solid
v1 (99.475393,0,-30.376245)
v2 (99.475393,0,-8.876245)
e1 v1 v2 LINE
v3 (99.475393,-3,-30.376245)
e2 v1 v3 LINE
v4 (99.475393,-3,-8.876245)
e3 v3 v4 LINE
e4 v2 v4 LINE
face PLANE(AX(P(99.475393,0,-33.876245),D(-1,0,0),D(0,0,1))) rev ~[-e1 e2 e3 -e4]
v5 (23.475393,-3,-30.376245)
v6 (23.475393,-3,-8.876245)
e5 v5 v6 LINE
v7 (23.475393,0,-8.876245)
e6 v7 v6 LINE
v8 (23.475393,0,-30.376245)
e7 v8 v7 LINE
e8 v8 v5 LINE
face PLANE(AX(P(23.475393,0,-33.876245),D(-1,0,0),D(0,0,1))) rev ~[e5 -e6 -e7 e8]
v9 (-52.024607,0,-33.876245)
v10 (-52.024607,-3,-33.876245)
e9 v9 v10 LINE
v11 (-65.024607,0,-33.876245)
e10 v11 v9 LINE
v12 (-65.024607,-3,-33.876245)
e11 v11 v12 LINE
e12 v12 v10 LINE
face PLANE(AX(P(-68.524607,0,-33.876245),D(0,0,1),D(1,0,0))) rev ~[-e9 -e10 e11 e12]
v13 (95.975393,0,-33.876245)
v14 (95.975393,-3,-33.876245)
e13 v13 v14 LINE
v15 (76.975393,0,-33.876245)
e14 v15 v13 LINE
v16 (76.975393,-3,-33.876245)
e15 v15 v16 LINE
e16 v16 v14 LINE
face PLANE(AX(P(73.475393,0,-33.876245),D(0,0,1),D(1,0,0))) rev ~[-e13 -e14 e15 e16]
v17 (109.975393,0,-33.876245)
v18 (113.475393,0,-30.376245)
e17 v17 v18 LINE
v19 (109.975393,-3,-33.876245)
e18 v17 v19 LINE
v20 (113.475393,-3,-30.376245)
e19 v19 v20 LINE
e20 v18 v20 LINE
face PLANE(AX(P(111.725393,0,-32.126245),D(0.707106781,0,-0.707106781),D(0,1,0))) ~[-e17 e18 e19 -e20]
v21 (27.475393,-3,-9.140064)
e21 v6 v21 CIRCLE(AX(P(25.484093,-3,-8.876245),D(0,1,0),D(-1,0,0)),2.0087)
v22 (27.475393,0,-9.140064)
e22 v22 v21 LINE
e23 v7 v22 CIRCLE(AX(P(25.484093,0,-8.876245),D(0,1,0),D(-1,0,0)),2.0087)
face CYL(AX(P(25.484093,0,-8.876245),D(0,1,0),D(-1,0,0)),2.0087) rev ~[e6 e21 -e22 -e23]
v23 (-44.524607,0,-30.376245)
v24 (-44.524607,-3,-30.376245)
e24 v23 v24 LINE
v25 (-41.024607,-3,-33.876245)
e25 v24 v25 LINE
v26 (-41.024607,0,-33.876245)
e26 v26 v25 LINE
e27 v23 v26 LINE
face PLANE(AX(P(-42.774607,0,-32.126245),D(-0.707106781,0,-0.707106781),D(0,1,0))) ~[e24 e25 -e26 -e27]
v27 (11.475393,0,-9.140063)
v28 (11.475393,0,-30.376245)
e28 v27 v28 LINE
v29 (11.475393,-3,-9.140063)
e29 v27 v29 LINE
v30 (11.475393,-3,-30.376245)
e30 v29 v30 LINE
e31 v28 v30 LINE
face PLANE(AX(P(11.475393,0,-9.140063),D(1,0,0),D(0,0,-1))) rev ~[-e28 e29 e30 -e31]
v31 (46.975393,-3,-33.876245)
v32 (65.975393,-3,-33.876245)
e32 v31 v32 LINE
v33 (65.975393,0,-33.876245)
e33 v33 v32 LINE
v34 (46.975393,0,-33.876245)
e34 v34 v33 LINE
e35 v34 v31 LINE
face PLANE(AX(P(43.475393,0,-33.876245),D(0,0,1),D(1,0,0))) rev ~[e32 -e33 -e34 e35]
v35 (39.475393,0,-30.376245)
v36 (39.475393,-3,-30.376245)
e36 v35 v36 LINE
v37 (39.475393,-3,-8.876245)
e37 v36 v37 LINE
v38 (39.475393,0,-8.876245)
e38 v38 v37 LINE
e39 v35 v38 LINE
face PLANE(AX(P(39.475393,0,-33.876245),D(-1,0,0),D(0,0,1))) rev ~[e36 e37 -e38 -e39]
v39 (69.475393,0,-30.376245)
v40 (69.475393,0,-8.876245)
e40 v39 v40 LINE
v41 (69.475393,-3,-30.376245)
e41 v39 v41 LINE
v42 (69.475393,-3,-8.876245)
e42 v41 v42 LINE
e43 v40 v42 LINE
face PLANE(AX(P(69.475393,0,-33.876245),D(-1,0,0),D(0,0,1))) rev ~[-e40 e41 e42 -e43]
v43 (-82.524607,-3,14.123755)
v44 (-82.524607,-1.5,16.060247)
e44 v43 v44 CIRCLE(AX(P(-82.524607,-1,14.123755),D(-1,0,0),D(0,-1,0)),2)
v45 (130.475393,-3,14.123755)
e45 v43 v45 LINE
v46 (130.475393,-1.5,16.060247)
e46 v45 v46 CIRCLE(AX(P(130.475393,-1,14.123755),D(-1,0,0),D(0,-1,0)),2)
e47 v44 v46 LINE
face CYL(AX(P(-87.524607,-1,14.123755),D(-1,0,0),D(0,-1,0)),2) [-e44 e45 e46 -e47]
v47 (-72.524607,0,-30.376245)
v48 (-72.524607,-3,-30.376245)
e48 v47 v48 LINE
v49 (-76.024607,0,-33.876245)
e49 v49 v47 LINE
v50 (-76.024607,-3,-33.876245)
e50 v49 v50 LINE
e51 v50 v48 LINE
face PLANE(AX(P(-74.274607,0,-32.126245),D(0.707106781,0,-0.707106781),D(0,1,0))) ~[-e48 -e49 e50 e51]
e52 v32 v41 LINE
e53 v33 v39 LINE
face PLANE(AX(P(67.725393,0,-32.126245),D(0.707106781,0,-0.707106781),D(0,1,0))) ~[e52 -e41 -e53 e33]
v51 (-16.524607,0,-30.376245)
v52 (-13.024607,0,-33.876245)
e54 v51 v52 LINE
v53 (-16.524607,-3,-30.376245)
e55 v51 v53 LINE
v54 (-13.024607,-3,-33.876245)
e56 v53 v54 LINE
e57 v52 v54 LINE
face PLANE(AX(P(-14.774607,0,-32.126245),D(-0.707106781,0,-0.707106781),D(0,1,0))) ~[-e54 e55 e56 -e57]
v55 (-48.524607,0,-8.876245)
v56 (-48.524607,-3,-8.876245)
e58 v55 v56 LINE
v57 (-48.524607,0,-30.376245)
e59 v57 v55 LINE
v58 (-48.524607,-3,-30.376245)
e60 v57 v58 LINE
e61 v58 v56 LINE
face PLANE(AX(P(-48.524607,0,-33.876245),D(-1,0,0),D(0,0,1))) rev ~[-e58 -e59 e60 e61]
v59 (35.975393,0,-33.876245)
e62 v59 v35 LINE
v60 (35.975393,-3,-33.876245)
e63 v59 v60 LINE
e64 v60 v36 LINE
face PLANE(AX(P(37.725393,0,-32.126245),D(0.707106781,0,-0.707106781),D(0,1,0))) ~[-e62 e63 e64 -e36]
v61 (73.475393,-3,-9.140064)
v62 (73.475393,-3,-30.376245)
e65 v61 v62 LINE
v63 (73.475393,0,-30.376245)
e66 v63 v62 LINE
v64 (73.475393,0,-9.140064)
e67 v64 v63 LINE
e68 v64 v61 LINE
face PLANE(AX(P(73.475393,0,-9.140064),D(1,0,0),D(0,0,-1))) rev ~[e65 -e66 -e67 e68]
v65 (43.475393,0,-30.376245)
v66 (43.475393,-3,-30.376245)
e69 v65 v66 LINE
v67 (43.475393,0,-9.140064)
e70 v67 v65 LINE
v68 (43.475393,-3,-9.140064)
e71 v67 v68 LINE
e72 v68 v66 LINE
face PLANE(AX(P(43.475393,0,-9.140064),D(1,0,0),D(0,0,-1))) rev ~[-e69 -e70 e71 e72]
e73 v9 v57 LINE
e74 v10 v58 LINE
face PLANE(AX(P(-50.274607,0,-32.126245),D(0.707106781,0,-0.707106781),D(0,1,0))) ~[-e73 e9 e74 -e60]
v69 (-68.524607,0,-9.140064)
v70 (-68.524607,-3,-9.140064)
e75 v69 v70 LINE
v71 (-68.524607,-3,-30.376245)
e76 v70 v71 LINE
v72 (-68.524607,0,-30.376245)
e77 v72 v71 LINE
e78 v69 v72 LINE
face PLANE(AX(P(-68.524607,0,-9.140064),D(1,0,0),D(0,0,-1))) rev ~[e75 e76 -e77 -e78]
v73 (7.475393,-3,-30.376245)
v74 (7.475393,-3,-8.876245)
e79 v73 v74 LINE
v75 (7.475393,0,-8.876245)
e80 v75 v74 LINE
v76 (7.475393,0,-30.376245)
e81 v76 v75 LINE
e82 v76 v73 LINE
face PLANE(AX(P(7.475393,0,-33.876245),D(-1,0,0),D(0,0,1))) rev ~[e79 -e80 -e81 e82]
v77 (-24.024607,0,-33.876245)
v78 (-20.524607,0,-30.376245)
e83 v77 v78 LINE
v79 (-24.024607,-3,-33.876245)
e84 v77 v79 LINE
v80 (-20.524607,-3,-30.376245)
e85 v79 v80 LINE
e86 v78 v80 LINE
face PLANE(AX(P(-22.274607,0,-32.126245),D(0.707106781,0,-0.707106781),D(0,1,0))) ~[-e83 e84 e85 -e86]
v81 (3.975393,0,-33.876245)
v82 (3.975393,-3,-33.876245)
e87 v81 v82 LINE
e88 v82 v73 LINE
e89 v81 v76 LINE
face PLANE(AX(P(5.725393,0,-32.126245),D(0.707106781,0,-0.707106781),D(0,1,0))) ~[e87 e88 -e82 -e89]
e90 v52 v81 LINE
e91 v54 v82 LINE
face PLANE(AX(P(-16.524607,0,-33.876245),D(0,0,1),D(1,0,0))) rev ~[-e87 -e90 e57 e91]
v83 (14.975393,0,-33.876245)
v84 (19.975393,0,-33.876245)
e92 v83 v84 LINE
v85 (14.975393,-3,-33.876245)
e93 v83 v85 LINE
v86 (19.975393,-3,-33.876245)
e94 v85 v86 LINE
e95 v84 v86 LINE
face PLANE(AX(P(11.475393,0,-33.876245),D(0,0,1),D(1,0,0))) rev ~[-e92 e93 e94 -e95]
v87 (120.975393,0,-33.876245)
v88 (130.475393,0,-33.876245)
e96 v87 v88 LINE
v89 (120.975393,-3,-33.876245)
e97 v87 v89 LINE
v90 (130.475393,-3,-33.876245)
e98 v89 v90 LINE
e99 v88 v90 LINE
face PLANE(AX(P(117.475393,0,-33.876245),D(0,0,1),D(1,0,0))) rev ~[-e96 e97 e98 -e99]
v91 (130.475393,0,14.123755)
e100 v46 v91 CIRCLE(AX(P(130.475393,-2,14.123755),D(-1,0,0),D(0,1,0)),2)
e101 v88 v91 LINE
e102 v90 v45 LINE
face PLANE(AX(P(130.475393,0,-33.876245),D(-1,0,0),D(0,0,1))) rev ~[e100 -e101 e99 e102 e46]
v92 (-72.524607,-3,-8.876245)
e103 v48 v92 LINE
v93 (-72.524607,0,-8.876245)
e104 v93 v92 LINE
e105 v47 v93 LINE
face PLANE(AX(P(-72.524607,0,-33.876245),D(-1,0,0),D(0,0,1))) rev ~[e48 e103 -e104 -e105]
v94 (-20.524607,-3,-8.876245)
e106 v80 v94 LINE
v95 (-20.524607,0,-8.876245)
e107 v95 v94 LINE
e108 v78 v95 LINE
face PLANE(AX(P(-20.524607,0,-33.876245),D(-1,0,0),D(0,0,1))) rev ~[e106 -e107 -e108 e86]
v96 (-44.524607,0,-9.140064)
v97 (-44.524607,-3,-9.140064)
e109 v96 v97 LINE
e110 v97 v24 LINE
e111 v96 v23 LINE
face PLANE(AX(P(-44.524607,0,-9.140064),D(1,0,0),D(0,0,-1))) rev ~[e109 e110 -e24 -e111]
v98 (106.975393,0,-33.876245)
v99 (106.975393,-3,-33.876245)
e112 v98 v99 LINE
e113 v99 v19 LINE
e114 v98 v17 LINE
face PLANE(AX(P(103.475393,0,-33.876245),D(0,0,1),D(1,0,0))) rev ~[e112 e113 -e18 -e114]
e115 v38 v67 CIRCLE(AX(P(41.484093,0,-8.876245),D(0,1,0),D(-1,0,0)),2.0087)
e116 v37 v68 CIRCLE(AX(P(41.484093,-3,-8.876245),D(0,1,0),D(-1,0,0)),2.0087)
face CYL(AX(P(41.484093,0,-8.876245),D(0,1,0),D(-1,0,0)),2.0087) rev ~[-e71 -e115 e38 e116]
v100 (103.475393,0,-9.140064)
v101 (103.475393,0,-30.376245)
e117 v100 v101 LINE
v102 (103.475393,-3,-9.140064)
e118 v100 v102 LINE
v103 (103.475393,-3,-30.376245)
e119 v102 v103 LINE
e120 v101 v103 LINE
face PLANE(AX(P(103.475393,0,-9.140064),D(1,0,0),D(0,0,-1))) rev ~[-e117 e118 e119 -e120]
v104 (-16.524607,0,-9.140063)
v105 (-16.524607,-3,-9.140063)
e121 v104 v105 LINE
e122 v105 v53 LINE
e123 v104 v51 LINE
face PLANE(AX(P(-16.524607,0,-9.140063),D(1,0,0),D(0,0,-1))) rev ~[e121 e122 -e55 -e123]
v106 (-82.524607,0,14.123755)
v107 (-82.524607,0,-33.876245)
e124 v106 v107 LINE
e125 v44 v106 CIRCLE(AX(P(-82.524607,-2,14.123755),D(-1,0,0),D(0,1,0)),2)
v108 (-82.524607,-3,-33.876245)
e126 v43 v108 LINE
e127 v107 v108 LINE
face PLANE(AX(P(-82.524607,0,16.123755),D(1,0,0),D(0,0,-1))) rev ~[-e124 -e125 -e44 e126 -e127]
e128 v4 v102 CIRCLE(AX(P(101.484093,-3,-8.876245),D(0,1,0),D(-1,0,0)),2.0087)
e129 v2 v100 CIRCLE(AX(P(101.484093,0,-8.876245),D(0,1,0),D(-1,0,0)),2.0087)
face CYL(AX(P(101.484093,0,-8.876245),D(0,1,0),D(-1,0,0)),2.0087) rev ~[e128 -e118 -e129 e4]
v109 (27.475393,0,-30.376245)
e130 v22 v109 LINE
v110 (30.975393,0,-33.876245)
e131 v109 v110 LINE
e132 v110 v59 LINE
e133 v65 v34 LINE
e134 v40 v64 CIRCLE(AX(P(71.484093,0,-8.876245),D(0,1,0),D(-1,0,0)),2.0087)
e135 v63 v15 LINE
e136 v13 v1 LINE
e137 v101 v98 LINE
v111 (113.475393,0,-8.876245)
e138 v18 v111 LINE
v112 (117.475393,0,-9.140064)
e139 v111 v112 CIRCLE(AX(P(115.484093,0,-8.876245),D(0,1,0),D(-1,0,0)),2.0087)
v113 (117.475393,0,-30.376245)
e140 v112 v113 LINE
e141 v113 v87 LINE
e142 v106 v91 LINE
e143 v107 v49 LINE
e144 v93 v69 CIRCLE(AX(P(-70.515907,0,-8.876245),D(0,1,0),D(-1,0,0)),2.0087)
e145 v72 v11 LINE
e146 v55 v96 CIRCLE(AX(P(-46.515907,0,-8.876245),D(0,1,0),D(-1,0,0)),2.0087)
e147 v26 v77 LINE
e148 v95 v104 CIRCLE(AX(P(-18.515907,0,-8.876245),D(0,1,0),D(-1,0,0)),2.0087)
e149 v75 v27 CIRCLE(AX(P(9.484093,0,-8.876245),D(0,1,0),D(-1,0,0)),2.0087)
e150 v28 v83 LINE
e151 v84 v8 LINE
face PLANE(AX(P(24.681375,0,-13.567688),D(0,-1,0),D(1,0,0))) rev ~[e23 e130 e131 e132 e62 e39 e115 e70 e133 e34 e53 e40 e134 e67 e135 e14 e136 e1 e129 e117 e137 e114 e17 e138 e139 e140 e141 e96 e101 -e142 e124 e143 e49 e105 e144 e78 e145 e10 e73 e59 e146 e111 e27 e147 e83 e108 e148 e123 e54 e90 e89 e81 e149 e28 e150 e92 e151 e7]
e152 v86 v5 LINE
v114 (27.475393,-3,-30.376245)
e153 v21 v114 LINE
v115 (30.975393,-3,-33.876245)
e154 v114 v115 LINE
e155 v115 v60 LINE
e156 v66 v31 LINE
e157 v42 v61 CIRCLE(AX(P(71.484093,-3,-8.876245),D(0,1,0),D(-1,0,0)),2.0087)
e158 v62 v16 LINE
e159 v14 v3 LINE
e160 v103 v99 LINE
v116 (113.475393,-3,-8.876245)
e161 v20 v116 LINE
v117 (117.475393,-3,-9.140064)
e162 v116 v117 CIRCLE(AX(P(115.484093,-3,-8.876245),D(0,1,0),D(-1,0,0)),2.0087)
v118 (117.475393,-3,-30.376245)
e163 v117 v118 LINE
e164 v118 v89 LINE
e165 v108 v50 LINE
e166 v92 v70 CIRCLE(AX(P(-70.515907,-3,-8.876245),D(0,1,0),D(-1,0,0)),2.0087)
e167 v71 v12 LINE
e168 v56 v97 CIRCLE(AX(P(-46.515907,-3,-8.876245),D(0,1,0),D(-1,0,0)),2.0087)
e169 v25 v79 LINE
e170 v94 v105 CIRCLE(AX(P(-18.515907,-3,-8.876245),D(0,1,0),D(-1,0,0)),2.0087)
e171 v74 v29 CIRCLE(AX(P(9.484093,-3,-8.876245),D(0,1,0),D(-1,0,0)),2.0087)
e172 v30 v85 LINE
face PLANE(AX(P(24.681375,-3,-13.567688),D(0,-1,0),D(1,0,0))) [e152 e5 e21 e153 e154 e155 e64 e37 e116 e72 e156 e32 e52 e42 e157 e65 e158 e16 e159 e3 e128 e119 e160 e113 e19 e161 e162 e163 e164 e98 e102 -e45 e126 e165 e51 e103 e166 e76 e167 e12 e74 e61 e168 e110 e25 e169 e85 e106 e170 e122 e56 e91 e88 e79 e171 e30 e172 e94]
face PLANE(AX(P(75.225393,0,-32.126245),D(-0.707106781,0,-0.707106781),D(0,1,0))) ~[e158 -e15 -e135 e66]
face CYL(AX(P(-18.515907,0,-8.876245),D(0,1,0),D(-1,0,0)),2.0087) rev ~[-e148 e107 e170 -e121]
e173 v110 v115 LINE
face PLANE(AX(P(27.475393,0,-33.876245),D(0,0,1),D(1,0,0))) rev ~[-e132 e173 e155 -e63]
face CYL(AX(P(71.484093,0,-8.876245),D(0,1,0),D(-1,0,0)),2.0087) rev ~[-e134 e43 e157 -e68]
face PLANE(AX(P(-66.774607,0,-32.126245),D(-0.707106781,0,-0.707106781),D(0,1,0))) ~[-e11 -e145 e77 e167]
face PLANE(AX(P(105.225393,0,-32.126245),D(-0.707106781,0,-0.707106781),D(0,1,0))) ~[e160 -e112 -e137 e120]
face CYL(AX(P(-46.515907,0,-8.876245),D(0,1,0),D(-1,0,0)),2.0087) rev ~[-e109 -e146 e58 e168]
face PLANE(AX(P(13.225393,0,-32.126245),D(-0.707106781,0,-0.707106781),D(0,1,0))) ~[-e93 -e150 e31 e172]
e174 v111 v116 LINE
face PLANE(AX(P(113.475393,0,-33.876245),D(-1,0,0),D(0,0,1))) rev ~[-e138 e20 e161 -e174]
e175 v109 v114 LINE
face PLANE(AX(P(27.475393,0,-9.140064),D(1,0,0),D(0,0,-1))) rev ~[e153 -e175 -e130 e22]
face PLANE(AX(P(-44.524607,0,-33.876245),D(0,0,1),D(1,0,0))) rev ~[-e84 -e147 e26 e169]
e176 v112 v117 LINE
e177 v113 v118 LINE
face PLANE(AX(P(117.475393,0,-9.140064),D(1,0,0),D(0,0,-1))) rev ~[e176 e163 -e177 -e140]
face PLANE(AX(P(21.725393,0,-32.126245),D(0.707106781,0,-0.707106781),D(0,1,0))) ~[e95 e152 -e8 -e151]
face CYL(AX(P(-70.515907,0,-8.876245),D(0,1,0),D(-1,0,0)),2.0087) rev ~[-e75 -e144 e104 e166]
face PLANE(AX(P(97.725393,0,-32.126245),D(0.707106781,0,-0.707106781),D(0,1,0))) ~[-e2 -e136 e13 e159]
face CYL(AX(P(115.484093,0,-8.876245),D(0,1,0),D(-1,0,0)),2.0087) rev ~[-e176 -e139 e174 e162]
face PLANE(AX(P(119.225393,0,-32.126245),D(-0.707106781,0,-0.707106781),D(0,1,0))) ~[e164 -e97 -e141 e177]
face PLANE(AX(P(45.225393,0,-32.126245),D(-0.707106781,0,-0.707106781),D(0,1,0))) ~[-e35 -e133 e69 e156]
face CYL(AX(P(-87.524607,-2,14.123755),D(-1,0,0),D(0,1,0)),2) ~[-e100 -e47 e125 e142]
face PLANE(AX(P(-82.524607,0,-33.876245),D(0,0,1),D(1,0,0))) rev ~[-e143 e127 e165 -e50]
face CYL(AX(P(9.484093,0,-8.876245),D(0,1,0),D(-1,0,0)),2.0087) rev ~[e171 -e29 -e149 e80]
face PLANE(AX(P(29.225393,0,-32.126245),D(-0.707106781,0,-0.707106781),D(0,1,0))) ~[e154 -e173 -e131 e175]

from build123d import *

# Parameters (mm, degrees)
F1_DEPTH    = 3
F2_SIZE     = 3.5
F3_T1_DEPTH = 223


# Not quite as in the source:
# - a fillet or chamfer that OpenCascade refuses, or shapes differently, is made with other operations: its cross-section is extruded or revolved along the edge and cut away or added


with BuildPart() as f1:
    # F0 (on Front) → F1 (new body)
    with BuildSketch(Plane.XZ):
        with BuildLine():
            Line((130.4753928185, 16.1237554376), (-82.5246071815, 16.1237554376))
            Line((-82.5246071815, 16.1237554376), (-82.5246071815, -33.8762445624))
            Line((-82.5246071815, -33.8762445624), (-72.5246071815, -33.8762445624))
            Line((-72.5246071815, -33.8762445624), (-72.5246071815, -8.8762445624))
            ThreePointArc((-72.5246071815, -8.8762445624), (-70.3837107757, -6.871899239), (-68.5246071815, -9.1400640085))
            Line((-68.5246071815, -9.1400640085), (-68.5246071815, -33.8762445624))
            Line((-68.5246071815, -33.8762445624), (-48.5246071815, -33.8762445624))
            Line((-48.5246071815, -33.8762445624), (-48.5246071815, -8.8762445624))
            ThreePointArc((-48.5246071815, -8.8762445624), (-46.3837107899, -6.8718992399), (-44.5246071815, -9.1400639837))
            Line((-44.5246071815, -9.1400639837), (-44.5246071815, -33.8762445624))
            Line((-44.5246071815, -33.8762445624), (-20.5246071815, -33.8762445624))
            Line((-20.5246071815, -33.8762445624), (-20.5246071815, -8.8762445624))
            ThreePointArc((-20.5246071815, -8.8762445624), (-18.3837111079, -6.8718992583), (-16.5246071815, -9.1400634249))
            Line((-16.5246071815, -9.1400634249), (-16.5246071815, -33.8762445624))
            Line((-16.5246071815, -33.8762445624), (7.4753928185, -33.8762445624))
            Line((7.4753928185, -33.8762445624), (7.4753928185, -8.8762445624))
            ThreePointArc((7.4753928185, -8.8762445624), (9.6162888921, -6.8718992583), (11.4753928185, -9.1400634249))
            Line((11.4753928185, -9.1400634249), (11.4753928185, -33.8762445624))
            Line((11.4753928185, -33.8762445624), (23.4753928185, -33.8762445624))
            Line((23.4753928185, -33.8762445624), (23.4753928185, -8.8762445624))
            ThreePointArc((23.4753928185, -8.8762445624), (25.6162892101, -6.8718992399), (27.4753928185, -9.1400639837))
            Line((27.4753928185, -9.1400639837), (27.4753928185, -33.8762445624))
            Line((27.4753928185, -33.8762445624), (39.4753928185, -33.8762445624))
            Line((39.4753928185, -33.8762445624), (39.4753928185, -8.8762445624))
            ThreePointArc((39.4753928185, -8.8762445624), (41.6162892243, -6.871899239), (43.4753928185, -9.1400640085))
            Line((43.4753928185, -9.1400640085), (43.4753928185, -33.8762445624))
            Line((43.4753928185, -33.8762445624), (69.4753928185, -33.8762445624))
            Line((69.4753928185, -33.8762445624), (69.4753928185, -8.8762445624))
            ThreePointArc((69.4753928185, -8.8762445624), (71.6162892243, -6.871899239), (73.4753928185, -9.1400640085))
            Line((73.4753928185, -9.1400640085), (73.4753928185, -33.8762445624))
            Line((73.4753928185, -33.8762445624), (99.4753928185, -33.8762445624))
            Line((99.4753928185, -33.8762445624), (99.4753928185, -8.8762445624))
            ThreePointArc((99.4753928185, -8.8762445624), (101.6162892243, -6.871899239), (103.4753928185, -9.1400640085))
            Line((103.4753928185, -9.1400640085), (103.4753928185, -33.8762445624))
            Line((103.4753928185, -33.8762445624), (113.4753928185, -33.8762445624))
            Line((113.4753928185, -33.8762445624), (113.4753928185, -8.8762445624))
            ThreePointArc((113.4753928185, -8.8762445624), (115.6162892243, -6.871899239), (117.4753928185, -9.1400640085))
            Line((117.4753928185, -9.1400640085), (117.4753928185, -33.8762445624))
            Line((117.4753928185, -33.8762445624), (130.4753928185, -33.8762445624))
            Line((130.4753928185, -33.8762445624), (130.4753928185, 16.1237554376))
        make_face()
    extrude(amount=F1_DEPTH)

    # F2
    f2_edges = [f1.edges().sort_by_distance(p)[0] for p in [
        (-72.524607, -1.5, -33.876245),
        (-48.524607, -1.5, -33.876245),
        (-20.524607, -1.5, -33.876245),
        (7.475393, -1.5, -33.876245),
        (23.475393, -1.5, -33.876245),
        (39.475393, -1.5, -33.876245),
        (69.475393, -1.5, -33.876245),
        (99.475393, -1.5, -33.876245),
        (113.475393, -1.5, -33.876245),
        (103.475393, -1.5, -33.876245),
        (117.475393, -1.5, -33.876245),
        (73.475393, -1.5, -33.876245),
        (43.475393, -1.5, -33.876245),
        (27.475393, -1.5, -33.876245),
        (11.475393, -1.5, -33.876245),
        (-16.524607, -1.5, -33.876245),
        (-44.524607, -1.5, -33.876245),
        (-68.524607, -1.5, -33.876245),
    ]]
    chamfer(f2_edges, length=F2_SIZE)

    # F3: fillet of radius 2 on 2 edges, made by hand

    # F3_s2 → F3_t1 (cut)
    with BuildSketch(Plane.YZ.offset(-87.5246071815)):
        with BuildLine():
            ThreePointArc((-3, 14.1237554376), (-2.4142135624, 15.537969), (-1, 16.1237554376))
            Line((-1, 16.1237554376), (-3, 16.1237554376))
            Line((-3, 16.1237554376), (-3, 14.1237554376))
        make_face()
        with BuildLine():
            ThreePointArc((0, 14.1237554376), (-0.5857864376, 15.537969), (-2, 16.1237554376))
            Line((-2, 16.1237554376), (0, 16.1237554376))
            Line((0, 16.1237554376), (0, 14.1237554376))
        make_face()
    extrude(amount=F3_T1_DEPTH, mode=Mode.SUBTRACT)


solid = f1.part
